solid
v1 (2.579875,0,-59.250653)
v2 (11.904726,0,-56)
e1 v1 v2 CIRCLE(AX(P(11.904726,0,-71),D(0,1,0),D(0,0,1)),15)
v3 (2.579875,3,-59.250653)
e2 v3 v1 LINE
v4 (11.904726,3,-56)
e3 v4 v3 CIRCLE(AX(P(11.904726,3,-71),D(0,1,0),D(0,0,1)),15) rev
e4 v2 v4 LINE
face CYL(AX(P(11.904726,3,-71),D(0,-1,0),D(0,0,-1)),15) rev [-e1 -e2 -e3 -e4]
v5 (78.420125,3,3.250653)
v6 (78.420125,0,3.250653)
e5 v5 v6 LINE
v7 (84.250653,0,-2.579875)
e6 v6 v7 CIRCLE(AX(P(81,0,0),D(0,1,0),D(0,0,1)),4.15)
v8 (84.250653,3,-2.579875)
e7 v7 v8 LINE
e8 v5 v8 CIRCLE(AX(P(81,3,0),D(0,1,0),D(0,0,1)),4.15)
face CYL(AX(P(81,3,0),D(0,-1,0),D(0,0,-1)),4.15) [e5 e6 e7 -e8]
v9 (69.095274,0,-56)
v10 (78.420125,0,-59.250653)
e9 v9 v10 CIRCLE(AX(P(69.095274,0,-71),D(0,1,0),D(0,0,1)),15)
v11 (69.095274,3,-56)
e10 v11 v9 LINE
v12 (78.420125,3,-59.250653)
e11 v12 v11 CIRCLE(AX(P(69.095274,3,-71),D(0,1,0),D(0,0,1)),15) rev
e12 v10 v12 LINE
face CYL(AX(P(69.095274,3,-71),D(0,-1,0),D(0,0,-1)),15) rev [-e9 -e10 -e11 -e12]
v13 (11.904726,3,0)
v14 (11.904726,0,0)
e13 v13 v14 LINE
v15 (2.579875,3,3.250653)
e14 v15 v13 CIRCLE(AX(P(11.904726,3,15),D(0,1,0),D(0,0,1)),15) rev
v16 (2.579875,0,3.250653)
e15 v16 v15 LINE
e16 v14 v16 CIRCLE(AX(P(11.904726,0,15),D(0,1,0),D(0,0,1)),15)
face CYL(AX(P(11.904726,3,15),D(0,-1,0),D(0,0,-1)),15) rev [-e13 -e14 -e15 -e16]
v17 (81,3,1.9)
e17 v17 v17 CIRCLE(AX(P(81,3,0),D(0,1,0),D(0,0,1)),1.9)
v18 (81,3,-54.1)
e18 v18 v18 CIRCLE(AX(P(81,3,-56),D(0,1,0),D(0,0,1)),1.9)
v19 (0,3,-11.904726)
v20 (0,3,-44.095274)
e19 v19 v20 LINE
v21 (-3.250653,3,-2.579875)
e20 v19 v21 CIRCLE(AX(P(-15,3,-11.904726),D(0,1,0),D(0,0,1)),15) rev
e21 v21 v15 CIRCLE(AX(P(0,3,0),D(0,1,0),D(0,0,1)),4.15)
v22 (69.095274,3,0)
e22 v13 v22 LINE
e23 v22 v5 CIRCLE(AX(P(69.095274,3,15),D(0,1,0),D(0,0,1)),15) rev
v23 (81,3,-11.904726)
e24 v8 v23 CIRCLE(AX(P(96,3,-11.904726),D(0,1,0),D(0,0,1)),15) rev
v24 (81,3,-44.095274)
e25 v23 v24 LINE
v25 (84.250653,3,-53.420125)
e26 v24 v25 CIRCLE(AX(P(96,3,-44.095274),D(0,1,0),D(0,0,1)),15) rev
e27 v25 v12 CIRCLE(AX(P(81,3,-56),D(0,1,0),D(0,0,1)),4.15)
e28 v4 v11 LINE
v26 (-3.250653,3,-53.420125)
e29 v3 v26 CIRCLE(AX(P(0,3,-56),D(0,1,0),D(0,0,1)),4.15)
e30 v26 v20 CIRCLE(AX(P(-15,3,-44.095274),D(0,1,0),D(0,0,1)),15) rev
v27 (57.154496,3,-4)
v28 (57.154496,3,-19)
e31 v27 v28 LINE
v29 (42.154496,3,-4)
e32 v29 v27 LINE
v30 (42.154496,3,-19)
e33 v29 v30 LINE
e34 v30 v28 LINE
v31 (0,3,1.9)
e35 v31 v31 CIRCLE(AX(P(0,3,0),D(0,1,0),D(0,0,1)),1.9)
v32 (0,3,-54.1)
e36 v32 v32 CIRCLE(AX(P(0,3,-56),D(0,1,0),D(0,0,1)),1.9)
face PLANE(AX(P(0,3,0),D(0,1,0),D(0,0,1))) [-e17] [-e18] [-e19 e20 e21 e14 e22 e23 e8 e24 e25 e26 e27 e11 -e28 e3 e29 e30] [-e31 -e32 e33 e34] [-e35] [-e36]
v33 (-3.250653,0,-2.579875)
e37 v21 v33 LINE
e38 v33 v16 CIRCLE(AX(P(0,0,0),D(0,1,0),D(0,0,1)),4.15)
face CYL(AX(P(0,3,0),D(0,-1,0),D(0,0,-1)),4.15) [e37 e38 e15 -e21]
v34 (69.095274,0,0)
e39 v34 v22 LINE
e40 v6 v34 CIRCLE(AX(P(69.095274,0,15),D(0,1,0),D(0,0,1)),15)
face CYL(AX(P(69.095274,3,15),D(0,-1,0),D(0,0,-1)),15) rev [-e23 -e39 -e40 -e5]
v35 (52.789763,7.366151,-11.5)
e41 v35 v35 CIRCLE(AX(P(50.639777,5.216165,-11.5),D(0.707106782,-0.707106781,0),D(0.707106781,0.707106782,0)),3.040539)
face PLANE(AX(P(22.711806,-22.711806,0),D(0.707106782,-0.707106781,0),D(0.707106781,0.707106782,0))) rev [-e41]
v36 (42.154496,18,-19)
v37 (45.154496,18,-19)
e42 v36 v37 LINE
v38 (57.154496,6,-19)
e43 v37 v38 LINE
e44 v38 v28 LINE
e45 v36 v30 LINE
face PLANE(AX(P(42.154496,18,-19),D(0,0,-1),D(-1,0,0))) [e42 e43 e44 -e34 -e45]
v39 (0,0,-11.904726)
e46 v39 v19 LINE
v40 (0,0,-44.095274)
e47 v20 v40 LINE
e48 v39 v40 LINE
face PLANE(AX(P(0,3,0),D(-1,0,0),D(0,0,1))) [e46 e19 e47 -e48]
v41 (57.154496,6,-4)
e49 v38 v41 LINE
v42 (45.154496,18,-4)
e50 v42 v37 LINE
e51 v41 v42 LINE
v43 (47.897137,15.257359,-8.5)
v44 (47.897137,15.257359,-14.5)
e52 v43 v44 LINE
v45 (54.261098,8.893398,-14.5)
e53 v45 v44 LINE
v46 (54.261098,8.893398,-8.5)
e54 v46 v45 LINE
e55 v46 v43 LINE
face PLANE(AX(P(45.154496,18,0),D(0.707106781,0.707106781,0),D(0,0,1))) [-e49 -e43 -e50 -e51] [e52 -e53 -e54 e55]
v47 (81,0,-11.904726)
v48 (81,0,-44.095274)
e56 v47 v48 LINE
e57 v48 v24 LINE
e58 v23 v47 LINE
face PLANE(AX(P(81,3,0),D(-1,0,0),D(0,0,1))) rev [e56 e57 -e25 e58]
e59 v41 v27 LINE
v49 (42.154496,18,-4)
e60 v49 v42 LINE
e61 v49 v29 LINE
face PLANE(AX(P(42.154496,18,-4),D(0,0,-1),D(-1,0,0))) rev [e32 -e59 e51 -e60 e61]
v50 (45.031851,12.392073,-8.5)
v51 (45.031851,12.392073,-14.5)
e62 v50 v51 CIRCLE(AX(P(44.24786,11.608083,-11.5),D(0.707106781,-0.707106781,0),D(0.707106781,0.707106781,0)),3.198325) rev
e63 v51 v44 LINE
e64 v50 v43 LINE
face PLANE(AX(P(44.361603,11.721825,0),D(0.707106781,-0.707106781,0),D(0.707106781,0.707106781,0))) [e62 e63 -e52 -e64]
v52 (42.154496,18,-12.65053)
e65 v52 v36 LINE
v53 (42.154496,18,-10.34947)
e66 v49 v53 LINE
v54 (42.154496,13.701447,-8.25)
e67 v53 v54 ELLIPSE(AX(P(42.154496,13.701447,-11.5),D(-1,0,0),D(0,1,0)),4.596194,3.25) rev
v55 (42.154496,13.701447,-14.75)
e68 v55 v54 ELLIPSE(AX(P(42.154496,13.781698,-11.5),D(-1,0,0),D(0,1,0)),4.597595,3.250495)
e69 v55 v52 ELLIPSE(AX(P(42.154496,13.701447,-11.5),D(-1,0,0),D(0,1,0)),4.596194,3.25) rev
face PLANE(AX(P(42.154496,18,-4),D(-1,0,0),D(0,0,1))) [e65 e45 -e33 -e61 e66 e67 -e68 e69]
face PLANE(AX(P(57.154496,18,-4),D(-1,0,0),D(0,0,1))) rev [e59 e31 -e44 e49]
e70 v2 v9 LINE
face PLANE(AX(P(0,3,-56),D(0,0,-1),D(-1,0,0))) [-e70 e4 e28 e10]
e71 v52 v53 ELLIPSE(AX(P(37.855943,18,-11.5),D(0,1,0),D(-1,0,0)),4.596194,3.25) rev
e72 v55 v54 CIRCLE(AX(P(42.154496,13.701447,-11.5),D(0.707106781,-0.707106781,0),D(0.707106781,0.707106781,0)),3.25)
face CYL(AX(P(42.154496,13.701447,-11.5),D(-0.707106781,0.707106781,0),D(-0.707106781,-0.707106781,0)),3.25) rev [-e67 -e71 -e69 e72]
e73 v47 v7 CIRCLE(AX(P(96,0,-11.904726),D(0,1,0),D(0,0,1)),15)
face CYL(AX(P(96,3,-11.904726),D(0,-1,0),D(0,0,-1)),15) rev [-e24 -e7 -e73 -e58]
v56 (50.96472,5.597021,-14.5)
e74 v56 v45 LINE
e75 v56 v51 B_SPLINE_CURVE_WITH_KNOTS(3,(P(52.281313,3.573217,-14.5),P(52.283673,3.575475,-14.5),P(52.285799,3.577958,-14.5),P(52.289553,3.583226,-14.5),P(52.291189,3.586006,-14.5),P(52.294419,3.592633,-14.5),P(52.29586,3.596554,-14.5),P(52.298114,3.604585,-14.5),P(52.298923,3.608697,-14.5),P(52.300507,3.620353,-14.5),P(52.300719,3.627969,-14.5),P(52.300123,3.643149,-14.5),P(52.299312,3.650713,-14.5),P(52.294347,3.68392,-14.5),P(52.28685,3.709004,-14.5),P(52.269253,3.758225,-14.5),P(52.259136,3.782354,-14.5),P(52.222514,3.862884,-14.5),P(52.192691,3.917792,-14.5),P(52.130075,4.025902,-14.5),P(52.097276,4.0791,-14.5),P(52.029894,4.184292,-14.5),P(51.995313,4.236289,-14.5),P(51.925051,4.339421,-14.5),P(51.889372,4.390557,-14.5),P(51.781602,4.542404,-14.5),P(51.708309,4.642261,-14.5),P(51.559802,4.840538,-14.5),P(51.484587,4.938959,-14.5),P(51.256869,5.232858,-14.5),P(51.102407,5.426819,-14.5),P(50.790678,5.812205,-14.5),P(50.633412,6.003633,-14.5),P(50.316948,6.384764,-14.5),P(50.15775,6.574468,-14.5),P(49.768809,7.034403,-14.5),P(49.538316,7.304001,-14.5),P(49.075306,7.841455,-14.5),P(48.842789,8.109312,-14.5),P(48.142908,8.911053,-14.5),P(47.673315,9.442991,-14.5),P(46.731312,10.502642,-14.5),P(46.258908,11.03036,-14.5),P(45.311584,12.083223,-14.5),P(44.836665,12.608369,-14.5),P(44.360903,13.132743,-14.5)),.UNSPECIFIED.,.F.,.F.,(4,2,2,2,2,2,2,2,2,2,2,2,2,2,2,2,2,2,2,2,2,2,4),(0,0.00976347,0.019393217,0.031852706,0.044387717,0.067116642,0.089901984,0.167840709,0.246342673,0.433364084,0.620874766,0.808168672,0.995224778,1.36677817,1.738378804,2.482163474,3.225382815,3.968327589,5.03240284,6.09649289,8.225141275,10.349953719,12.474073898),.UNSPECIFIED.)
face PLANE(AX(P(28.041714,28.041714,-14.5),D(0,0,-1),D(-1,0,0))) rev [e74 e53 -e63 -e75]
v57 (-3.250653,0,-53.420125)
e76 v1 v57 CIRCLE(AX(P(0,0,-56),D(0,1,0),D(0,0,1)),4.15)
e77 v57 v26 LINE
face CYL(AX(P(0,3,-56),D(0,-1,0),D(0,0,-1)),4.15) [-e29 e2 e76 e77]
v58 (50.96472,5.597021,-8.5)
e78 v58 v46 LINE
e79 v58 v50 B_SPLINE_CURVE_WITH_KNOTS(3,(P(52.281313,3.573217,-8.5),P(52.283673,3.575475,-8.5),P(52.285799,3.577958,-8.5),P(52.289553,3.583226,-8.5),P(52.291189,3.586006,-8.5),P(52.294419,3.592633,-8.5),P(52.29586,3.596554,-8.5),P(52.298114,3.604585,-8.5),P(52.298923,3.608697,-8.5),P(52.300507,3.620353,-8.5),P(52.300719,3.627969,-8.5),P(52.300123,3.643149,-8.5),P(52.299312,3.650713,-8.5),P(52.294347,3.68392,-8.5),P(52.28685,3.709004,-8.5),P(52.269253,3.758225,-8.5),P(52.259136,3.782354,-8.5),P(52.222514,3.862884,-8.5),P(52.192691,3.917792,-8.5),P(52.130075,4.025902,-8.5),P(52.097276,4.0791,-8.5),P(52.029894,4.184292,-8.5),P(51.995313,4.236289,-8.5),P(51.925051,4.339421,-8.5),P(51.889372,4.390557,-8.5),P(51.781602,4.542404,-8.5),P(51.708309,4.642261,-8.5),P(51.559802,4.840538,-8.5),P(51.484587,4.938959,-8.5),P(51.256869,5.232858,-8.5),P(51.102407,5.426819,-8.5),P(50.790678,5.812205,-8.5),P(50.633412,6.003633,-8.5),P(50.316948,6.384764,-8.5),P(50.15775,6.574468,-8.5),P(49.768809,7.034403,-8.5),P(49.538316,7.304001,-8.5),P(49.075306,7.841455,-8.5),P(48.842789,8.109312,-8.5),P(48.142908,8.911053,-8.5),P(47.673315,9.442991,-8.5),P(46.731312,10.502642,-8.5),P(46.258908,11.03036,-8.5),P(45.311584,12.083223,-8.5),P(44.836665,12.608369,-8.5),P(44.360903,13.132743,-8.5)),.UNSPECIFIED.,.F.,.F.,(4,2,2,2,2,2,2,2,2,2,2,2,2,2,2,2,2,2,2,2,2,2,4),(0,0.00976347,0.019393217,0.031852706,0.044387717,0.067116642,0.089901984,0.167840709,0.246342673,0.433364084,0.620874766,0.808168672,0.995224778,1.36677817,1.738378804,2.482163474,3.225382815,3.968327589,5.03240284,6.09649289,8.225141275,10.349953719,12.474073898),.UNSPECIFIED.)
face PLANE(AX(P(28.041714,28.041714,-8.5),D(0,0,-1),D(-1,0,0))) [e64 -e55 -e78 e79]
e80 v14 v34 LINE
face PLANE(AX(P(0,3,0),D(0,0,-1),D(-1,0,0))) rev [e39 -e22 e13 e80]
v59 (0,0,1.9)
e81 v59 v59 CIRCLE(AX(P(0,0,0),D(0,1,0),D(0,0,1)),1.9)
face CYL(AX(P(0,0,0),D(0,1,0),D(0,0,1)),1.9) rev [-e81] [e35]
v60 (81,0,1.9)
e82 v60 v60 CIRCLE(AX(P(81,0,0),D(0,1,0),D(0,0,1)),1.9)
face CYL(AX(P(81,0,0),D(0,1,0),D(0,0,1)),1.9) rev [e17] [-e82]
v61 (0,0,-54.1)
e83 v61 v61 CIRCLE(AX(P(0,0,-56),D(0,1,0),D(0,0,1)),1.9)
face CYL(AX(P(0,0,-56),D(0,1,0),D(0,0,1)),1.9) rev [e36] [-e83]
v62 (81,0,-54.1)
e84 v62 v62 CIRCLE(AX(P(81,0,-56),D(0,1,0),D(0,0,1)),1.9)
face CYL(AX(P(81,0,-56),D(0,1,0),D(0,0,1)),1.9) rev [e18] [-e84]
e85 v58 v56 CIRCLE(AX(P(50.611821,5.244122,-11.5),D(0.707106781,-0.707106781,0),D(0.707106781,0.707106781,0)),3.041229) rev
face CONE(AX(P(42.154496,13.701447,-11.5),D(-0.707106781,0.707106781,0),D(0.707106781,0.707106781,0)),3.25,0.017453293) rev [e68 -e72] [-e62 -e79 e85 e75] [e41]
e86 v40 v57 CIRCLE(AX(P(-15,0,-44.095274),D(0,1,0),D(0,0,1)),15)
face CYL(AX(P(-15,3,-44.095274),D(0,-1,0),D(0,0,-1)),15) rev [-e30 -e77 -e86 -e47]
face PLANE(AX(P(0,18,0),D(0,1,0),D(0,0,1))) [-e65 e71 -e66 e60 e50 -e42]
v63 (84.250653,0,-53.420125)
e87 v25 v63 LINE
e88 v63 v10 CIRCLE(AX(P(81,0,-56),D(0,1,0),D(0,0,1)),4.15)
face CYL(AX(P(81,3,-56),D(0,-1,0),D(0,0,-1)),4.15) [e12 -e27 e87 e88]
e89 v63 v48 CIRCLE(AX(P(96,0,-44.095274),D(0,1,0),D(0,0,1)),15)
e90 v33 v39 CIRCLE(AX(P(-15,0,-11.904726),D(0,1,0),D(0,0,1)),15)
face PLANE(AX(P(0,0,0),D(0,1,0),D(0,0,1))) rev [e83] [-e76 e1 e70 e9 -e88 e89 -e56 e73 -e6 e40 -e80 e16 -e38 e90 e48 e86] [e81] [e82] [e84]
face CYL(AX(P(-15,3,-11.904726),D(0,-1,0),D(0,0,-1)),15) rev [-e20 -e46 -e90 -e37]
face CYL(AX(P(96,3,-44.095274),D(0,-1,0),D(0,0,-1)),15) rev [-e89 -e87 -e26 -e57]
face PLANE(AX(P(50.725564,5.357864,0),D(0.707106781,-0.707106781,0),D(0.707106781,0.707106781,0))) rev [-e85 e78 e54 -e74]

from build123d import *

# Parameters (mm, degrees)
BOSS_EXTRUDE1_DEPTH     = 3
FILLET1_R               = 15
SKETCH2_R               = 1.9
CUT_EXTRUDE1_DEPTH      = 3
SKETCH3_W               = 15
SKETCH3_H               = 15
BOSS_EXTRUDE2_DEPTH     = 15
CHAMFER1_SIZE           = 12
F_3DSKETCH1_R           = 3.25
CUT_EXTRUDE2_DEPTH      = 12
CUT_EXTRUDE2_TAPER      = 1
CUT_EXTRUDE2_DEPTH_BACK = 12
SKETCH4_W               = 6
SKETCH4_H               = 9
CUT_EXTRUDE3_DEPTH      = 5


with BuildPart() as part:
    # Sketch1 → Boss-Extrude1 (new body)
    with BuildSketch(Plane(origin=(0, 0, 0), x_dir=(1, 0, 0), z_dir=(0, 1, 0))):
        with BuildLine():
            ThreePointArc((0, 4.15), (-2.934493142, -2.934493142), (4.15, 0))
            Line((4.15, 0), (76.85, 0))
            ThreePointArc((76.85, 0), (83.934493142, -2.934493142), (81, 4.15))
            Line((81, 4.15), (81, 51.85))
            ThreePointArc((81, 51.85), (83.934493142, 58.934493142), (76.85, 56))
            Line((76.85, 56), (4.15, 56))
            ThreePointArc((4.15, 56), (-2.934493142, 58.934493142), (0, 51.85))
            Line((0, 51.85), (0, 4.15))
        make_face()
    extrude(amount=BOSS_EXTRUDE1_DEPTH)

    # Fillet1
    fillet1_edges = [part.edges().sort_by_distance(p)[0] for p in [
        (0, 1.5, -51.85),
        (4.15, 1.5, -56),
        (76.85, 1.5, -56),
        (81, 1.5, -51.85),
        (81, 1.5, -4.15),
        (76.85, 1.5, 0),
        (0, 1.5, -4.15),
        (4.15, 1.5, 0),
    ]]
    fillet(fillet1_edges, radius=FILLET1_R)

    # Sketch2 → Cut-Extrude1 (cut)
    with BuildSketch(Plane(origin=(0, 3, 0), x_dir=(1, 0, 0), z_dir=(0, 1, 0))):
        with Locations((0, 56)):
            Circle(SKETCH2_R)
        with Locations((81, 56)):
            Circle(SKETCH2_R)
        with Locations((81, 0)):
            Circle(SKETCH2_R)
        Circle(SKETCH2_R)
    extrude(amount=-CUT_EXTRUDE1_DEPTH, mode=Mode.SUBTRACT)

    # Sketch3 → Boss-Extrude2 (add)
    with BuildSketch(Plane(origin=(0, 3, 0), x_dir=(1, 0, 0), z_dir=(0, 1, 0))):
        with Locations((49.654495899, 11.5)):
            Rectangle(SKETCH3_W, SKETCH3_H)
    extrude(amount=BOSS_EXTRUDE2_DEPTH)

    # Chamfer1
    chamfer1_edges = [part.edges().sort_by_distance(p)[0] for p in [
        (57.154495899, 18, -11.5),
    ]]
    chamfer(chamfer1_edges, length=CHAMFER1_SIZE)

    # 3DSketch1 → Cut-Extrude2 (cut, two sides)
    with BuildSketch(Plane(origin=(42.154495899, 13.701446828, -11.5), x_dir=(0, 0, -1), z_dir=(0.7071067811865464, -0.7071067811865488, 0))) as cut_extrude2_sk:
        Circle(F_3DSKETCH1_R)
    extrude(amount=CUT_EXTRUDE2_DEPTH, taper=CUT_EXTRUDE2_TAPER, mode=Mode.SUBTRACT)
    extrude(cut_extrude2_sk.sketch, amount=-CUT_EXTRUDE2_DEPTH_BACK, mode=Mode.SUBTRACT)

    # Sketch4 → Cut-Extrude3 (cut)
    with BuildSketch(Plane(origin=(31.57724795, 31.57724795, 0), x_dir=(0, 0, -1), z_dir=(0.7071067811865487, 0.7071067811865465, 0))):
        with Locations((11.5, -27.579807846)):
            Rectangle(SKETCH4_W, SKETCH4_H)
    extrude(amount=-CUT_EXTRUDE3_DEPTH, mode=Mode.SUBTRACT)


solid = part.part
